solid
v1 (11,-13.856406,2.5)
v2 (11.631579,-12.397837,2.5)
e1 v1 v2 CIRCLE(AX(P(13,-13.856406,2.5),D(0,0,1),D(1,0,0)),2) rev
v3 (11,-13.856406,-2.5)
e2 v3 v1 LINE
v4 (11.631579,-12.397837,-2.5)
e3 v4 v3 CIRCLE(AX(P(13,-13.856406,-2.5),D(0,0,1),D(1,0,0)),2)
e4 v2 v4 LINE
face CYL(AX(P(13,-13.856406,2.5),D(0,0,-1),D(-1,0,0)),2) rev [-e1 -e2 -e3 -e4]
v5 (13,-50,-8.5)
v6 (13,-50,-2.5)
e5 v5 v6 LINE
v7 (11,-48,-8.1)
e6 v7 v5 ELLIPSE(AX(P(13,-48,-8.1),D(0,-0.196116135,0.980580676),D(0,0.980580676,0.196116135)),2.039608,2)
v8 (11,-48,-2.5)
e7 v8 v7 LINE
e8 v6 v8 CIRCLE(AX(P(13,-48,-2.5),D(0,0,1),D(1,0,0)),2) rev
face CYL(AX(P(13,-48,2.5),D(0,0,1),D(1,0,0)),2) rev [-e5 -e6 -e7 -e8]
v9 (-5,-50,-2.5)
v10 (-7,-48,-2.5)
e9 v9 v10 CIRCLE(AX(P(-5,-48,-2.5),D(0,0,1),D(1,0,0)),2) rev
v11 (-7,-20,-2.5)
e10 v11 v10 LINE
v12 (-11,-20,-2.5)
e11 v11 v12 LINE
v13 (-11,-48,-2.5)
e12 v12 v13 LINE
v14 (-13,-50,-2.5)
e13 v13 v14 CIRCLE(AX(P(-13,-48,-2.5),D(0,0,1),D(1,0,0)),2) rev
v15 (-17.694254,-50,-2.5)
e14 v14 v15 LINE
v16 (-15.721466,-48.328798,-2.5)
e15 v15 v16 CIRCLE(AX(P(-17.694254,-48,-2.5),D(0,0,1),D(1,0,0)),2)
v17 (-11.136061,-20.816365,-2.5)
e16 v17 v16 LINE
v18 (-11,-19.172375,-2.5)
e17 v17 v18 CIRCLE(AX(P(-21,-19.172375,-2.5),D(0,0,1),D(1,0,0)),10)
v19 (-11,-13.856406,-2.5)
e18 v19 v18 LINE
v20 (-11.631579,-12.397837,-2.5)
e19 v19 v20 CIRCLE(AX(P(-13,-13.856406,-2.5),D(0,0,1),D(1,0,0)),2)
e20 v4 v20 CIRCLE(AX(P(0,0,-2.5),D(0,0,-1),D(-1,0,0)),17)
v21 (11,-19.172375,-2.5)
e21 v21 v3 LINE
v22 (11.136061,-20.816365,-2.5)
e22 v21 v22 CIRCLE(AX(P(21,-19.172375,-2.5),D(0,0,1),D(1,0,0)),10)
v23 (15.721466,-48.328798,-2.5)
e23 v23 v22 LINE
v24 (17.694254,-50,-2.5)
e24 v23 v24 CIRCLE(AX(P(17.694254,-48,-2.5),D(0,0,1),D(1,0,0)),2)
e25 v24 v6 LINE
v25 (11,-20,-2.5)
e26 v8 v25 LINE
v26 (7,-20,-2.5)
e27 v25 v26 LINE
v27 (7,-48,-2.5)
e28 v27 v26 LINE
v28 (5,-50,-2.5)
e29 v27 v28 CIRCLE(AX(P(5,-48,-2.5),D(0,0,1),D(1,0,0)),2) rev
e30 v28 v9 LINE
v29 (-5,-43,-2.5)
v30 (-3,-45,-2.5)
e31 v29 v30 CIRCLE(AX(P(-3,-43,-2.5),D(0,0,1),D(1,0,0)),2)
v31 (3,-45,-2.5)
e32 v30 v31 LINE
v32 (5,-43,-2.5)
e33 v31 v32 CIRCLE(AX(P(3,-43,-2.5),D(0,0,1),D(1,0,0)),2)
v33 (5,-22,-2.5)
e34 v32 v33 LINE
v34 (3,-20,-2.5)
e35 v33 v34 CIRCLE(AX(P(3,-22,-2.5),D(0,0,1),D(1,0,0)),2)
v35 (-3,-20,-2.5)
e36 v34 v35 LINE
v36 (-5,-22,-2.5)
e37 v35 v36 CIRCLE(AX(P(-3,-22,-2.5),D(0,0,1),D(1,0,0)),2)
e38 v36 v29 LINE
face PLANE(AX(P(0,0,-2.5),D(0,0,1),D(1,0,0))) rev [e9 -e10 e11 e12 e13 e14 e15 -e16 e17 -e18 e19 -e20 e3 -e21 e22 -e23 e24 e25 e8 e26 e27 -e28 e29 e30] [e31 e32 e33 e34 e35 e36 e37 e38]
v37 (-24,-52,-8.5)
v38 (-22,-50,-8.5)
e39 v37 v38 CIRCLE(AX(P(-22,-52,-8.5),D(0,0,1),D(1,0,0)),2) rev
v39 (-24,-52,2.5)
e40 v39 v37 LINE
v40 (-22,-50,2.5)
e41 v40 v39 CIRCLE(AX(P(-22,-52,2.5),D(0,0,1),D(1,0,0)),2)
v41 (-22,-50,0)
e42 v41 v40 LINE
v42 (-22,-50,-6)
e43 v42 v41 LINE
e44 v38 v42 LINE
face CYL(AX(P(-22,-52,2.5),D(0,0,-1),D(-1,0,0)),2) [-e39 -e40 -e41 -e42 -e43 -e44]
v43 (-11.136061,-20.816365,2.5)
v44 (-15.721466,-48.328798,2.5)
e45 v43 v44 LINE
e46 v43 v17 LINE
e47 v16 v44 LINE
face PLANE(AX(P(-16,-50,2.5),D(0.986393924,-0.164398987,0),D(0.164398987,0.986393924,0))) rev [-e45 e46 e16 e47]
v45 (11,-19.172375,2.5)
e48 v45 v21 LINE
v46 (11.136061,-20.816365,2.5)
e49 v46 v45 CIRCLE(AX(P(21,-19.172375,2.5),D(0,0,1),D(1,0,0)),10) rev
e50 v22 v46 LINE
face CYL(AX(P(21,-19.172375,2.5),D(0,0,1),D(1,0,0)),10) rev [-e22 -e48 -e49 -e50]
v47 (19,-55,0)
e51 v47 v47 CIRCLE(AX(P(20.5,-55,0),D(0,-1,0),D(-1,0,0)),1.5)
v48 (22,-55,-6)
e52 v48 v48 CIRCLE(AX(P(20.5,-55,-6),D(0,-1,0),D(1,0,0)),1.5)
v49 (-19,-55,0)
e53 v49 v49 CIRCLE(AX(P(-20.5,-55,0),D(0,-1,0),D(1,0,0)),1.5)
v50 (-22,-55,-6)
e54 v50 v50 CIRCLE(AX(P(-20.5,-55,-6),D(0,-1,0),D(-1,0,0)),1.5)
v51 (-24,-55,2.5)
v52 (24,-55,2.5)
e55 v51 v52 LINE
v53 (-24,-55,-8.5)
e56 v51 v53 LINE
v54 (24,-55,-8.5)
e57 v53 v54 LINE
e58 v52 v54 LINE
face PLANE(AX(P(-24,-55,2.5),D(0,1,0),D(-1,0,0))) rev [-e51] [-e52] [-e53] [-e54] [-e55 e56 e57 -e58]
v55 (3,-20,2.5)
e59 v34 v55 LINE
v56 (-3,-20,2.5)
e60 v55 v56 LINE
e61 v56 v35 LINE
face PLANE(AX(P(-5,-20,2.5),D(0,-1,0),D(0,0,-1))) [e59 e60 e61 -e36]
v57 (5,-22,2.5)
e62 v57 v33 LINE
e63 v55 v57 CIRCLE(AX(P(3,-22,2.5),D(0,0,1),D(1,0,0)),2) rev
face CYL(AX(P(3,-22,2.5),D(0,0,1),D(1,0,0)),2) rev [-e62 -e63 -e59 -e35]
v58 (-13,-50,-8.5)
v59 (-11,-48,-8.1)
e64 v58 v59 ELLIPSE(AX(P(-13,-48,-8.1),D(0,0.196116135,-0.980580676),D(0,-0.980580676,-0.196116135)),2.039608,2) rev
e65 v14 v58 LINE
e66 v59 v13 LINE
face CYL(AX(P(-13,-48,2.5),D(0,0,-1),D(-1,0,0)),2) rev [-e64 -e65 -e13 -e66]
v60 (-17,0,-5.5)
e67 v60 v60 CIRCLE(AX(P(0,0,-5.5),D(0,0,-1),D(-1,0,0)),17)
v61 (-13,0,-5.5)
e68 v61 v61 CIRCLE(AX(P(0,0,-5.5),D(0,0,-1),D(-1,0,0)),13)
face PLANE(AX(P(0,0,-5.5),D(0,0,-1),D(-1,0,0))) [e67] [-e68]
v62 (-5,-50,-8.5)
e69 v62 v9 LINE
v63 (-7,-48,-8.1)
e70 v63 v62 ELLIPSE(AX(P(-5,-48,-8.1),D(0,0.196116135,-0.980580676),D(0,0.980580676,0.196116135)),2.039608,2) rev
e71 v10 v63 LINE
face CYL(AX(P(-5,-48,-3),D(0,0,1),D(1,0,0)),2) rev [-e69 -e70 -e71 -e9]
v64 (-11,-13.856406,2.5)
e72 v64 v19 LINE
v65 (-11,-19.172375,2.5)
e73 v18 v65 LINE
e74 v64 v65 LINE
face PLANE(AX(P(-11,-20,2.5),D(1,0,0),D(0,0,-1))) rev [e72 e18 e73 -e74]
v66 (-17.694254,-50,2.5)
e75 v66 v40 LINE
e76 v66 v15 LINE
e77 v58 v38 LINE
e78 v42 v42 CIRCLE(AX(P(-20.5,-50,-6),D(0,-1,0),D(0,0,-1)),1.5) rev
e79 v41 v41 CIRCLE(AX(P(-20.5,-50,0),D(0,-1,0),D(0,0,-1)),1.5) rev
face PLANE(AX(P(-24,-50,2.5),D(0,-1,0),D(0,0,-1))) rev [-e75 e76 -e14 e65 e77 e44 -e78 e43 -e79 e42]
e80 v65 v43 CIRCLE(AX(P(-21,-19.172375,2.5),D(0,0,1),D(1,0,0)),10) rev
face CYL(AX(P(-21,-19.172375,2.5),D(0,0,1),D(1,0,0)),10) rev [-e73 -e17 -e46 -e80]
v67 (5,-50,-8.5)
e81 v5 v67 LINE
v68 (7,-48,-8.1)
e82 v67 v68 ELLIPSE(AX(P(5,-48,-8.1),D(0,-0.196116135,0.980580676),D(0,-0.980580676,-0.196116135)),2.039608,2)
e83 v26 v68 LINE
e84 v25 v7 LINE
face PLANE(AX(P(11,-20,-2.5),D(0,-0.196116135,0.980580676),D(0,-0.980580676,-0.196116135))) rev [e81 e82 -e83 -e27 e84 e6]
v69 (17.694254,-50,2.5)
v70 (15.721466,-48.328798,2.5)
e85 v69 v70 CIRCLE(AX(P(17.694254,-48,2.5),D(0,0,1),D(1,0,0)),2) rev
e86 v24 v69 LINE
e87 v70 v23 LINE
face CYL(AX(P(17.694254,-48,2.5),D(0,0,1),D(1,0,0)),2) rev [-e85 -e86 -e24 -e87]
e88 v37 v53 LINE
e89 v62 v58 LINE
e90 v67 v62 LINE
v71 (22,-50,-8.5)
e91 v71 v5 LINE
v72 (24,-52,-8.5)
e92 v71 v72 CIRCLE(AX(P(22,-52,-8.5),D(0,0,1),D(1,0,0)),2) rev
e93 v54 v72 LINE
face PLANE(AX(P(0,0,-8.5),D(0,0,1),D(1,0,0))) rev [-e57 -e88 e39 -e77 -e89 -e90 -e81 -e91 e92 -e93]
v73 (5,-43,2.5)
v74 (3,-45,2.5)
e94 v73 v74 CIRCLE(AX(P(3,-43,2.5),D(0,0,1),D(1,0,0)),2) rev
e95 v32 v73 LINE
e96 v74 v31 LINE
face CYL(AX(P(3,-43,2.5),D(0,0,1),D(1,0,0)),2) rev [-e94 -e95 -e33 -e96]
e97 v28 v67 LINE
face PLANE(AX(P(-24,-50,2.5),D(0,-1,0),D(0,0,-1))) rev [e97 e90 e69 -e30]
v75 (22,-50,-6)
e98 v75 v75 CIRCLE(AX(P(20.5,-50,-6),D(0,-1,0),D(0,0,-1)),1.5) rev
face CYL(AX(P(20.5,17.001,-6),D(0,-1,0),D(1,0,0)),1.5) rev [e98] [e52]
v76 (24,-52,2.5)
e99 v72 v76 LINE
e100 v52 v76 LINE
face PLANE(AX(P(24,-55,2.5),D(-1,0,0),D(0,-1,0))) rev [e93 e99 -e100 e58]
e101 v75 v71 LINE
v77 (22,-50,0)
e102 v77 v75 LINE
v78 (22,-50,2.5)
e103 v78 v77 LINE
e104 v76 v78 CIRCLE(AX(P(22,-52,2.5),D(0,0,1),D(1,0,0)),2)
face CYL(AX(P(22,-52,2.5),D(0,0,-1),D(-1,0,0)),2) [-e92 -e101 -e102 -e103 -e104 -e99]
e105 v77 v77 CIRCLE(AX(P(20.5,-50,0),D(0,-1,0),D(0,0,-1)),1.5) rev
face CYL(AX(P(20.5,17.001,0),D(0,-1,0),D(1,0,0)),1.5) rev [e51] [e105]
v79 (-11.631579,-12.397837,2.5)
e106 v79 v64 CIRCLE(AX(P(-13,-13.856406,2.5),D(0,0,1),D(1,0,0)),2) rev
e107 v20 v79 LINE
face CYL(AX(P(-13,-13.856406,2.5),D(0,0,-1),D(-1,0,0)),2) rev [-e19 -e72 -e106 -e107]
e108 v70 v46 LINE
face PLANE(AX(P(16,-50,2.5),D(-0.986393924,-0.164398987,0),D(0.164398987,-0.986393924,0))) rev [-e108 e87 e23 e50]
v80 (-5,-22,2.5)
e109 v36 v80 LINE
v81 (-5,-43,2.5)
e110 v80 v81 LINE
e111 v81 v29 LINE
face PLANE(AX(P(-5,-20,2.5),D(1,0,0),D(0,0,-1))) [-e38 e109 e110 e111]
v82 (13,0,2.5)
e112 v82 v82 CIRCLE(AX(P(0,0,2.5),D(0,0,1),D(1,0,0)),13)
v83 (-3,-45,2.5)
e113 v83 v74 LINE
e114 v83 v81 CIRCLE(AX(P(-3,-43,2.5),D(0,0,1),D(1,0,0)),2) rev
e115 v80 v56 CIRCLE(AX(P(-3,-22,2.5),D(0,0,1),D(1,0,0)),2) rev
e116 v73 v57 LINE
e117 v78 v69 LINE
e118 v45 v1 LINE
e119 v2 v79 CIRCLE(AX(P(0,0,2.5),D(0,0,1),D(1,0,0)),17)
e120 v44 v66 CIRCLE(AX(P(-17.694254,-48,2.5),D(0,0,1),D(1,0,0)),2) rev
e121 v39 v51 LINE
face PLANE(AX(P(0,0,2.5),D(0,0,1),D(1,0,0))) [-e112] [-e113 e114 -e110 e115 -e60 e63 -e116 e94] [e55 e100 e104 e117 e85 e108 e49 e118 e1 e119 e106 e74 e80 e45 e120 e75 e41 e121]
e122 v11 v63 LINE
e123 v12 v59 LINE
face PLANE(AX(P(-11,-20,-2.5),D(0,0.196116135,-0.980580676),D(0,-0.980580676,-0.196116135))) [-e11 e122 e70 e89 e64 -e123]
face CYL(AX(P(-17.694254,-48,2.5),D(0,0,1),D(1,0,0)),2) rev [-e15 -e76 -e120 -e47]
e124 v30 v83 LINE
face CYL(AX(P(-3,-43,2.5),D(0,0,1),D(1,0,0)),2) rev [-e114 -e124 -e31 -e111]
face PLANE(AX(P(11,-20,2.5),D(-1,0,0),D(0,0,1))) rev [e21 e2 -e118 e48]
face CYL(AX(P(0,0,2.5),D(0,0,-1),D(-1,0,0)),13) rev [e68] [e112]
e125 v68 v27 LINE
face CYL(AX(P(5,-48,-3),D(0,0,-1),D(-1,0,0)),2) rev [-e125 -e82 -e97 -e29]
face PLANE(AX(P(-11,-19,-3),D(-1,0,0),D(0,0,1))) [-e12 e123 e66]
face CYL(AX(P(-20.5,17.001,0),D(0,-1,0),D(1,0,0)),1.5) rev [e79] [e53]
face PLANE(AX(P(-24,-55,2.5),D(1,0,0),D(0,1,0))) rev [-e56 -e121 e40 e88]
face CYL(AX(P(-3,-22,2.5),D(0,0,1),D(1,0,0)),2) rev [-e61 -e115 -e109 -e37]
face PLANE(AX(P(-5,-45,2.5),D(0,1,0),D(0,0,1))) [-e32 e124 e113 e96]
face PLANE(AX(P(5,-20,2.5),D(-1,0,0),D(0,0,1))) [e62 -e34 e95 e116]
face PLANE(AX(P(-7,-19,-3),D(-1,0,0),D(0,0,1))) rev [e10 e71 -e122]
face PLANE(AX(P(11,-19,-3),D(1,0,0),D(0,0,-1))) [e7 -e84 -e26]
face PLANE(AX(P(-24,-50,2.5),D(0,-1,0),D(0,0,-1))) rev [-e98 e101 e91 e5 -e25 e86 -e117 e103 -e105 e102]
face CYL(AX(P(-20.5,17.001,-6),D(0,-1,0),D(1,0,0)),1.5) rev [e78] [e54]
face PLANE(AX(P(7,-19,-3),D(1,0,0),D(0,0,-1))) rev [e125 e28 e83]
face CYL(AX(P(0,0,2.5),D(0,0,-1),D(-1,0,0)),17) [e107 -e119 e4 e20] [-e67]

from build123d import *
from build123d.topology import SkipClean

# Parameters (mm, degrees)
SKETCH_1_R           = 13
SKETCH_1_W           = 10
SKETCH_1_H           = 25
EXTRUDE_1_DEPTH      = 2.5
EXTRUDE_2_DEPTH      = 2.5
EXTRUDE_2_DEPTH_BACK = 8.5
SKETCH_8_W           = 48
SKETCH_8_H           = 5
CUT_EXTRUDE_1_REACH  = 78.369
SKETCH_9_R           = 1.5
RIB_3_REACH          = 67.744
SKETCH_11_WALL_W     = 164.081759086
SKETCH_11_WALL_H     = 4
FILLET_1_R           = 2
FILLET_2_R           = 2
FILLET_3_R           = 10
SKETCH_12_R          = 17
SKETCH_12_R_2        = 13
EXTRUDE_3_DEPTH      = 3


# Some blends are built 0.0001 mm under size
with BuildPart() as part:
    # 草图1 → 凸台-拉伸1 (new, symmetric)
    with BuildSketch(Plane.XY):
        with BuildLine():
            Line((-24, -55), (24, -55))
            Line((24, -55), (24, -50))
            Line((24, -50), (16, -50))
            Line((16, -50), (11, -20))
            Line((11, -20), (11, -12.961481397))
            ThreePointArc((11, -12.961481397), (0, 17), (-11, -12.961481397))
            Line((-11, -12.961481397), (-11, -20))
            Line((-11, -20), (-16, -50))
            Line((-16, -50), (-24, -50))
            Line((-24, -50), (-24, -55))
        make_face()
        Circle(SKETCH_1_R, mode=Mode.SUBTRACT)
        with Locations((0, -32.5)):
            Rectangle(SKETCH_1_W, SKETCH_1_H, mode=Mode.SUBTRACT)
    extrude(amount=EXTRUDE_1_DEPTH, both=True)

    # 草图8 → 凸台-拉伸2 (add, two sides: drawn at the far end of the back side and taken through both)
    with BuildSketch(Plane.XY.offset(-EXTRUDE_2_DEPTH_BACK)):
        with Locations((0, -52.5)):
            Rectangle(SKETCH_8_W, SKETCH_8_H)
    extrude(amount=EXTRUDE_2_DEPTH + EXTRUDE_2_DEPTH_BACK)

    # 草图9 → 切除-拉伸1 (cut, up to next)
    with BuildSketch(Plane.XZ.offset(55), mode=Mode.PRIVATE) as cut_extrude_1_sk1:
        with Locations((-20.5, 0)):
            Circle(SKETCH_9_R)
    cut_extrude_1_tool1 = extrude(cut_extrude_1_sk1.sketch, amount=-CUT_EXTRUDE_1_REACH, mode=Mode.PRIVATE) & part.part
    # 草图9 → 切除-拉伸1 (cut, up to next)
    with BuildSketch(Plane.XZ.offset(55), mode=Mode.PRIVATE) as cut_extrude_1_sk2:
        with Locations(Location((20.5, 0, 0), (0, 0, 270))):
            Circle(SKETCH_9_R)
    cut_extrude_1_tool2 = extrude(cut_extrude_1_sk2.sketch, amount=-CUT_EXTRUDE_1_REACH, mode=Mode.PRIVATE) & part.part
    # 草图9 → 切除-拉伸1 (cut, up to next)
    with BuildSketch(Plane.XZ.offset(55), mode=Mode.PRIVATE) as cut_extrude_1_sk3:
        with Locations(Location((-20.5, -6, 0), (0, 0, 270))):
            Circle(SKETCH_9_R)
    cut_extrude_1_tool3 = extrude(cut_extrude_1_sk3.sketch, amount=-CUT_EXTRUDE_1_REACH, mode=Mode.PRIVATE) & part.part
    # 草图9 → 切除-拉伸1 (cut, up to next)
    with BuildSketch(Plane.XZ.offset(55), mode=Mode.PRIVATE) as cut_extrude_1_sk4:
        with Locations((20.5, -6)):
            Circle(SKETCH_9_R)
    cut_extrude_1_tool4 = extrude(cut_extrude_1_sk4.sketch, amount=-CUT_EXTRUDE_1_REACH, mode=Mode.PRIVATE) & part.part
    add(cut_extrude_1_tool1.solids().sort_by_distance((-20.5, -55, 0))[0], mode=Mode.SUBTRACT)
    add(cut_extrude_1_tool2.solids().sort_by_distance((20.5, -55, 0))[0], mode=Mode.SUBTRACT)
    add(cut_extrude_1_tool3.solids().sort_by_distance((-20.5, -55, -6))[0], mode=Mode.SUBTRACT)
    add(cut_extrude_1_tool4.solids().sort_by_distance((20.5, -55, -6))[0], mode=Mode.SUBTRACT)

    # 草图11 wall → 筋3 (add, up to next)
    with BuildSketch(Plane(origin=(-11, -35, -5.5), x_dir=(0, -0.980580675691, -0.196116135138), z_dir=(0, -0.196116135138, 0.980580675691)), mode=Mode.PRIVATE) as rib_3_sk1:
        with Locations((0, 2)):
            Rectangle(SKETCH_11_WALL_W, SKETCH_11_WALL_H)
    rib_3_tool1 = extrude(rib_3_sk1.sketch, amount=RIB_3_REACH, mode=Mode.PRIVATE) - part.part
    rib_3 = rib_3_tool1.solids().sort_by_distance((-11, -35, -5.5))[0]
    add(rib_3)

    # 镜向1: 筋3 across plane
    add(rib_3.mirror(Plane(origin=(0, 0, 0), x_dir=(0, 0, 1), z_dir=(1, 0, 0))))

    # 圆角1
    fillet_1_edges = [part.edges().sort_by_distance(p)[0] for p in [
        (11, -50, -5.5),
        (7, -50, -5.5),
        (-24, -50, -3),
        (-16, -50, 0),
        (16, -50, 0),
        (24, -50, -3),
        (5, -45, 0),
        (5, -20, 0),
        (-5, -20, 0),
        (-5, -45, 0),
        (-11, -50, -5.5),
        (-7, -50, -5.5),
    ]]
    fillet(fillet_1_edges, radius=FILLET_1_R - 0.0001)  # a hair under: the kernel refuses the full size

    # 圆角2
    fillet_2_edges = [part.edges().sort_by_distance(p)[0] for p in [
        (-11, -12.961481397, 0),
        (11, -12.961481397, 0),
    ]]
    fillet(fillet_2_edges, radius=FILLET_2_R)

    # 圆角3
    # the kernel refuses this fillet: 10 mm, written as the material it adds along each edge
    with BuildSketch(Plane(origin=(-11, -20, -2.5), x_dir=(0, 1, 0), z_dir=(0, 0, 1))) as fillet_3_piece_1:
        with BuildLine():
            CenterArc((FILLET_3_R * 0.0827625302982, FILLET_3_R), FILLET_3_R, 260.537677792, 9.462322208)
            Line((-FILLET_3_R * 0.0816364570071, FILLET_3_R * 0.0136060761679), (0, 0))
            Line((0, 0), (FILLET_3_R * 0.0827625302982, 0))
        make_face()
    extrude(amount=5)
    with BuildSketch(Plane(origin=(11, -20, -2.5), x_dir=(0, 1, 0), z_dir=(0, 0, 1))) as fillet_3_piece_2:
        with BuildLine():
            CenterArc((FILLET_3_R * 0.0827625302982, -FILLET_3_R), FILLET_3_R, 90, 9.462322208)
            Line((-FILLET_3_R * 0.0816364570071, -FILLET_3_R * 0.0136060761679), (0, 0))
            Line((0, 0), (FILLET_3_R * 0.0827625302982, 0))
        make_face()
    extrude(amount=5)

    # 草图12 → 凸台-拉伸3 (add)
    with SkipClean():  # the faces are left unmerged after this step: merging them gives an invalid solid
        with BuildSketch(Plane(origin=(0, 0, -2.5), x_dir=(-1, 0, 0), z_dir=(0, 0, -1))):
            Circle(SKETCH_12_R)
            Circle(SKETCH_12_R_2, mode=Mode.SUBTRACT)
        extrude(amount=EXTRUDE_3_DEPTH)


solid = part.part
